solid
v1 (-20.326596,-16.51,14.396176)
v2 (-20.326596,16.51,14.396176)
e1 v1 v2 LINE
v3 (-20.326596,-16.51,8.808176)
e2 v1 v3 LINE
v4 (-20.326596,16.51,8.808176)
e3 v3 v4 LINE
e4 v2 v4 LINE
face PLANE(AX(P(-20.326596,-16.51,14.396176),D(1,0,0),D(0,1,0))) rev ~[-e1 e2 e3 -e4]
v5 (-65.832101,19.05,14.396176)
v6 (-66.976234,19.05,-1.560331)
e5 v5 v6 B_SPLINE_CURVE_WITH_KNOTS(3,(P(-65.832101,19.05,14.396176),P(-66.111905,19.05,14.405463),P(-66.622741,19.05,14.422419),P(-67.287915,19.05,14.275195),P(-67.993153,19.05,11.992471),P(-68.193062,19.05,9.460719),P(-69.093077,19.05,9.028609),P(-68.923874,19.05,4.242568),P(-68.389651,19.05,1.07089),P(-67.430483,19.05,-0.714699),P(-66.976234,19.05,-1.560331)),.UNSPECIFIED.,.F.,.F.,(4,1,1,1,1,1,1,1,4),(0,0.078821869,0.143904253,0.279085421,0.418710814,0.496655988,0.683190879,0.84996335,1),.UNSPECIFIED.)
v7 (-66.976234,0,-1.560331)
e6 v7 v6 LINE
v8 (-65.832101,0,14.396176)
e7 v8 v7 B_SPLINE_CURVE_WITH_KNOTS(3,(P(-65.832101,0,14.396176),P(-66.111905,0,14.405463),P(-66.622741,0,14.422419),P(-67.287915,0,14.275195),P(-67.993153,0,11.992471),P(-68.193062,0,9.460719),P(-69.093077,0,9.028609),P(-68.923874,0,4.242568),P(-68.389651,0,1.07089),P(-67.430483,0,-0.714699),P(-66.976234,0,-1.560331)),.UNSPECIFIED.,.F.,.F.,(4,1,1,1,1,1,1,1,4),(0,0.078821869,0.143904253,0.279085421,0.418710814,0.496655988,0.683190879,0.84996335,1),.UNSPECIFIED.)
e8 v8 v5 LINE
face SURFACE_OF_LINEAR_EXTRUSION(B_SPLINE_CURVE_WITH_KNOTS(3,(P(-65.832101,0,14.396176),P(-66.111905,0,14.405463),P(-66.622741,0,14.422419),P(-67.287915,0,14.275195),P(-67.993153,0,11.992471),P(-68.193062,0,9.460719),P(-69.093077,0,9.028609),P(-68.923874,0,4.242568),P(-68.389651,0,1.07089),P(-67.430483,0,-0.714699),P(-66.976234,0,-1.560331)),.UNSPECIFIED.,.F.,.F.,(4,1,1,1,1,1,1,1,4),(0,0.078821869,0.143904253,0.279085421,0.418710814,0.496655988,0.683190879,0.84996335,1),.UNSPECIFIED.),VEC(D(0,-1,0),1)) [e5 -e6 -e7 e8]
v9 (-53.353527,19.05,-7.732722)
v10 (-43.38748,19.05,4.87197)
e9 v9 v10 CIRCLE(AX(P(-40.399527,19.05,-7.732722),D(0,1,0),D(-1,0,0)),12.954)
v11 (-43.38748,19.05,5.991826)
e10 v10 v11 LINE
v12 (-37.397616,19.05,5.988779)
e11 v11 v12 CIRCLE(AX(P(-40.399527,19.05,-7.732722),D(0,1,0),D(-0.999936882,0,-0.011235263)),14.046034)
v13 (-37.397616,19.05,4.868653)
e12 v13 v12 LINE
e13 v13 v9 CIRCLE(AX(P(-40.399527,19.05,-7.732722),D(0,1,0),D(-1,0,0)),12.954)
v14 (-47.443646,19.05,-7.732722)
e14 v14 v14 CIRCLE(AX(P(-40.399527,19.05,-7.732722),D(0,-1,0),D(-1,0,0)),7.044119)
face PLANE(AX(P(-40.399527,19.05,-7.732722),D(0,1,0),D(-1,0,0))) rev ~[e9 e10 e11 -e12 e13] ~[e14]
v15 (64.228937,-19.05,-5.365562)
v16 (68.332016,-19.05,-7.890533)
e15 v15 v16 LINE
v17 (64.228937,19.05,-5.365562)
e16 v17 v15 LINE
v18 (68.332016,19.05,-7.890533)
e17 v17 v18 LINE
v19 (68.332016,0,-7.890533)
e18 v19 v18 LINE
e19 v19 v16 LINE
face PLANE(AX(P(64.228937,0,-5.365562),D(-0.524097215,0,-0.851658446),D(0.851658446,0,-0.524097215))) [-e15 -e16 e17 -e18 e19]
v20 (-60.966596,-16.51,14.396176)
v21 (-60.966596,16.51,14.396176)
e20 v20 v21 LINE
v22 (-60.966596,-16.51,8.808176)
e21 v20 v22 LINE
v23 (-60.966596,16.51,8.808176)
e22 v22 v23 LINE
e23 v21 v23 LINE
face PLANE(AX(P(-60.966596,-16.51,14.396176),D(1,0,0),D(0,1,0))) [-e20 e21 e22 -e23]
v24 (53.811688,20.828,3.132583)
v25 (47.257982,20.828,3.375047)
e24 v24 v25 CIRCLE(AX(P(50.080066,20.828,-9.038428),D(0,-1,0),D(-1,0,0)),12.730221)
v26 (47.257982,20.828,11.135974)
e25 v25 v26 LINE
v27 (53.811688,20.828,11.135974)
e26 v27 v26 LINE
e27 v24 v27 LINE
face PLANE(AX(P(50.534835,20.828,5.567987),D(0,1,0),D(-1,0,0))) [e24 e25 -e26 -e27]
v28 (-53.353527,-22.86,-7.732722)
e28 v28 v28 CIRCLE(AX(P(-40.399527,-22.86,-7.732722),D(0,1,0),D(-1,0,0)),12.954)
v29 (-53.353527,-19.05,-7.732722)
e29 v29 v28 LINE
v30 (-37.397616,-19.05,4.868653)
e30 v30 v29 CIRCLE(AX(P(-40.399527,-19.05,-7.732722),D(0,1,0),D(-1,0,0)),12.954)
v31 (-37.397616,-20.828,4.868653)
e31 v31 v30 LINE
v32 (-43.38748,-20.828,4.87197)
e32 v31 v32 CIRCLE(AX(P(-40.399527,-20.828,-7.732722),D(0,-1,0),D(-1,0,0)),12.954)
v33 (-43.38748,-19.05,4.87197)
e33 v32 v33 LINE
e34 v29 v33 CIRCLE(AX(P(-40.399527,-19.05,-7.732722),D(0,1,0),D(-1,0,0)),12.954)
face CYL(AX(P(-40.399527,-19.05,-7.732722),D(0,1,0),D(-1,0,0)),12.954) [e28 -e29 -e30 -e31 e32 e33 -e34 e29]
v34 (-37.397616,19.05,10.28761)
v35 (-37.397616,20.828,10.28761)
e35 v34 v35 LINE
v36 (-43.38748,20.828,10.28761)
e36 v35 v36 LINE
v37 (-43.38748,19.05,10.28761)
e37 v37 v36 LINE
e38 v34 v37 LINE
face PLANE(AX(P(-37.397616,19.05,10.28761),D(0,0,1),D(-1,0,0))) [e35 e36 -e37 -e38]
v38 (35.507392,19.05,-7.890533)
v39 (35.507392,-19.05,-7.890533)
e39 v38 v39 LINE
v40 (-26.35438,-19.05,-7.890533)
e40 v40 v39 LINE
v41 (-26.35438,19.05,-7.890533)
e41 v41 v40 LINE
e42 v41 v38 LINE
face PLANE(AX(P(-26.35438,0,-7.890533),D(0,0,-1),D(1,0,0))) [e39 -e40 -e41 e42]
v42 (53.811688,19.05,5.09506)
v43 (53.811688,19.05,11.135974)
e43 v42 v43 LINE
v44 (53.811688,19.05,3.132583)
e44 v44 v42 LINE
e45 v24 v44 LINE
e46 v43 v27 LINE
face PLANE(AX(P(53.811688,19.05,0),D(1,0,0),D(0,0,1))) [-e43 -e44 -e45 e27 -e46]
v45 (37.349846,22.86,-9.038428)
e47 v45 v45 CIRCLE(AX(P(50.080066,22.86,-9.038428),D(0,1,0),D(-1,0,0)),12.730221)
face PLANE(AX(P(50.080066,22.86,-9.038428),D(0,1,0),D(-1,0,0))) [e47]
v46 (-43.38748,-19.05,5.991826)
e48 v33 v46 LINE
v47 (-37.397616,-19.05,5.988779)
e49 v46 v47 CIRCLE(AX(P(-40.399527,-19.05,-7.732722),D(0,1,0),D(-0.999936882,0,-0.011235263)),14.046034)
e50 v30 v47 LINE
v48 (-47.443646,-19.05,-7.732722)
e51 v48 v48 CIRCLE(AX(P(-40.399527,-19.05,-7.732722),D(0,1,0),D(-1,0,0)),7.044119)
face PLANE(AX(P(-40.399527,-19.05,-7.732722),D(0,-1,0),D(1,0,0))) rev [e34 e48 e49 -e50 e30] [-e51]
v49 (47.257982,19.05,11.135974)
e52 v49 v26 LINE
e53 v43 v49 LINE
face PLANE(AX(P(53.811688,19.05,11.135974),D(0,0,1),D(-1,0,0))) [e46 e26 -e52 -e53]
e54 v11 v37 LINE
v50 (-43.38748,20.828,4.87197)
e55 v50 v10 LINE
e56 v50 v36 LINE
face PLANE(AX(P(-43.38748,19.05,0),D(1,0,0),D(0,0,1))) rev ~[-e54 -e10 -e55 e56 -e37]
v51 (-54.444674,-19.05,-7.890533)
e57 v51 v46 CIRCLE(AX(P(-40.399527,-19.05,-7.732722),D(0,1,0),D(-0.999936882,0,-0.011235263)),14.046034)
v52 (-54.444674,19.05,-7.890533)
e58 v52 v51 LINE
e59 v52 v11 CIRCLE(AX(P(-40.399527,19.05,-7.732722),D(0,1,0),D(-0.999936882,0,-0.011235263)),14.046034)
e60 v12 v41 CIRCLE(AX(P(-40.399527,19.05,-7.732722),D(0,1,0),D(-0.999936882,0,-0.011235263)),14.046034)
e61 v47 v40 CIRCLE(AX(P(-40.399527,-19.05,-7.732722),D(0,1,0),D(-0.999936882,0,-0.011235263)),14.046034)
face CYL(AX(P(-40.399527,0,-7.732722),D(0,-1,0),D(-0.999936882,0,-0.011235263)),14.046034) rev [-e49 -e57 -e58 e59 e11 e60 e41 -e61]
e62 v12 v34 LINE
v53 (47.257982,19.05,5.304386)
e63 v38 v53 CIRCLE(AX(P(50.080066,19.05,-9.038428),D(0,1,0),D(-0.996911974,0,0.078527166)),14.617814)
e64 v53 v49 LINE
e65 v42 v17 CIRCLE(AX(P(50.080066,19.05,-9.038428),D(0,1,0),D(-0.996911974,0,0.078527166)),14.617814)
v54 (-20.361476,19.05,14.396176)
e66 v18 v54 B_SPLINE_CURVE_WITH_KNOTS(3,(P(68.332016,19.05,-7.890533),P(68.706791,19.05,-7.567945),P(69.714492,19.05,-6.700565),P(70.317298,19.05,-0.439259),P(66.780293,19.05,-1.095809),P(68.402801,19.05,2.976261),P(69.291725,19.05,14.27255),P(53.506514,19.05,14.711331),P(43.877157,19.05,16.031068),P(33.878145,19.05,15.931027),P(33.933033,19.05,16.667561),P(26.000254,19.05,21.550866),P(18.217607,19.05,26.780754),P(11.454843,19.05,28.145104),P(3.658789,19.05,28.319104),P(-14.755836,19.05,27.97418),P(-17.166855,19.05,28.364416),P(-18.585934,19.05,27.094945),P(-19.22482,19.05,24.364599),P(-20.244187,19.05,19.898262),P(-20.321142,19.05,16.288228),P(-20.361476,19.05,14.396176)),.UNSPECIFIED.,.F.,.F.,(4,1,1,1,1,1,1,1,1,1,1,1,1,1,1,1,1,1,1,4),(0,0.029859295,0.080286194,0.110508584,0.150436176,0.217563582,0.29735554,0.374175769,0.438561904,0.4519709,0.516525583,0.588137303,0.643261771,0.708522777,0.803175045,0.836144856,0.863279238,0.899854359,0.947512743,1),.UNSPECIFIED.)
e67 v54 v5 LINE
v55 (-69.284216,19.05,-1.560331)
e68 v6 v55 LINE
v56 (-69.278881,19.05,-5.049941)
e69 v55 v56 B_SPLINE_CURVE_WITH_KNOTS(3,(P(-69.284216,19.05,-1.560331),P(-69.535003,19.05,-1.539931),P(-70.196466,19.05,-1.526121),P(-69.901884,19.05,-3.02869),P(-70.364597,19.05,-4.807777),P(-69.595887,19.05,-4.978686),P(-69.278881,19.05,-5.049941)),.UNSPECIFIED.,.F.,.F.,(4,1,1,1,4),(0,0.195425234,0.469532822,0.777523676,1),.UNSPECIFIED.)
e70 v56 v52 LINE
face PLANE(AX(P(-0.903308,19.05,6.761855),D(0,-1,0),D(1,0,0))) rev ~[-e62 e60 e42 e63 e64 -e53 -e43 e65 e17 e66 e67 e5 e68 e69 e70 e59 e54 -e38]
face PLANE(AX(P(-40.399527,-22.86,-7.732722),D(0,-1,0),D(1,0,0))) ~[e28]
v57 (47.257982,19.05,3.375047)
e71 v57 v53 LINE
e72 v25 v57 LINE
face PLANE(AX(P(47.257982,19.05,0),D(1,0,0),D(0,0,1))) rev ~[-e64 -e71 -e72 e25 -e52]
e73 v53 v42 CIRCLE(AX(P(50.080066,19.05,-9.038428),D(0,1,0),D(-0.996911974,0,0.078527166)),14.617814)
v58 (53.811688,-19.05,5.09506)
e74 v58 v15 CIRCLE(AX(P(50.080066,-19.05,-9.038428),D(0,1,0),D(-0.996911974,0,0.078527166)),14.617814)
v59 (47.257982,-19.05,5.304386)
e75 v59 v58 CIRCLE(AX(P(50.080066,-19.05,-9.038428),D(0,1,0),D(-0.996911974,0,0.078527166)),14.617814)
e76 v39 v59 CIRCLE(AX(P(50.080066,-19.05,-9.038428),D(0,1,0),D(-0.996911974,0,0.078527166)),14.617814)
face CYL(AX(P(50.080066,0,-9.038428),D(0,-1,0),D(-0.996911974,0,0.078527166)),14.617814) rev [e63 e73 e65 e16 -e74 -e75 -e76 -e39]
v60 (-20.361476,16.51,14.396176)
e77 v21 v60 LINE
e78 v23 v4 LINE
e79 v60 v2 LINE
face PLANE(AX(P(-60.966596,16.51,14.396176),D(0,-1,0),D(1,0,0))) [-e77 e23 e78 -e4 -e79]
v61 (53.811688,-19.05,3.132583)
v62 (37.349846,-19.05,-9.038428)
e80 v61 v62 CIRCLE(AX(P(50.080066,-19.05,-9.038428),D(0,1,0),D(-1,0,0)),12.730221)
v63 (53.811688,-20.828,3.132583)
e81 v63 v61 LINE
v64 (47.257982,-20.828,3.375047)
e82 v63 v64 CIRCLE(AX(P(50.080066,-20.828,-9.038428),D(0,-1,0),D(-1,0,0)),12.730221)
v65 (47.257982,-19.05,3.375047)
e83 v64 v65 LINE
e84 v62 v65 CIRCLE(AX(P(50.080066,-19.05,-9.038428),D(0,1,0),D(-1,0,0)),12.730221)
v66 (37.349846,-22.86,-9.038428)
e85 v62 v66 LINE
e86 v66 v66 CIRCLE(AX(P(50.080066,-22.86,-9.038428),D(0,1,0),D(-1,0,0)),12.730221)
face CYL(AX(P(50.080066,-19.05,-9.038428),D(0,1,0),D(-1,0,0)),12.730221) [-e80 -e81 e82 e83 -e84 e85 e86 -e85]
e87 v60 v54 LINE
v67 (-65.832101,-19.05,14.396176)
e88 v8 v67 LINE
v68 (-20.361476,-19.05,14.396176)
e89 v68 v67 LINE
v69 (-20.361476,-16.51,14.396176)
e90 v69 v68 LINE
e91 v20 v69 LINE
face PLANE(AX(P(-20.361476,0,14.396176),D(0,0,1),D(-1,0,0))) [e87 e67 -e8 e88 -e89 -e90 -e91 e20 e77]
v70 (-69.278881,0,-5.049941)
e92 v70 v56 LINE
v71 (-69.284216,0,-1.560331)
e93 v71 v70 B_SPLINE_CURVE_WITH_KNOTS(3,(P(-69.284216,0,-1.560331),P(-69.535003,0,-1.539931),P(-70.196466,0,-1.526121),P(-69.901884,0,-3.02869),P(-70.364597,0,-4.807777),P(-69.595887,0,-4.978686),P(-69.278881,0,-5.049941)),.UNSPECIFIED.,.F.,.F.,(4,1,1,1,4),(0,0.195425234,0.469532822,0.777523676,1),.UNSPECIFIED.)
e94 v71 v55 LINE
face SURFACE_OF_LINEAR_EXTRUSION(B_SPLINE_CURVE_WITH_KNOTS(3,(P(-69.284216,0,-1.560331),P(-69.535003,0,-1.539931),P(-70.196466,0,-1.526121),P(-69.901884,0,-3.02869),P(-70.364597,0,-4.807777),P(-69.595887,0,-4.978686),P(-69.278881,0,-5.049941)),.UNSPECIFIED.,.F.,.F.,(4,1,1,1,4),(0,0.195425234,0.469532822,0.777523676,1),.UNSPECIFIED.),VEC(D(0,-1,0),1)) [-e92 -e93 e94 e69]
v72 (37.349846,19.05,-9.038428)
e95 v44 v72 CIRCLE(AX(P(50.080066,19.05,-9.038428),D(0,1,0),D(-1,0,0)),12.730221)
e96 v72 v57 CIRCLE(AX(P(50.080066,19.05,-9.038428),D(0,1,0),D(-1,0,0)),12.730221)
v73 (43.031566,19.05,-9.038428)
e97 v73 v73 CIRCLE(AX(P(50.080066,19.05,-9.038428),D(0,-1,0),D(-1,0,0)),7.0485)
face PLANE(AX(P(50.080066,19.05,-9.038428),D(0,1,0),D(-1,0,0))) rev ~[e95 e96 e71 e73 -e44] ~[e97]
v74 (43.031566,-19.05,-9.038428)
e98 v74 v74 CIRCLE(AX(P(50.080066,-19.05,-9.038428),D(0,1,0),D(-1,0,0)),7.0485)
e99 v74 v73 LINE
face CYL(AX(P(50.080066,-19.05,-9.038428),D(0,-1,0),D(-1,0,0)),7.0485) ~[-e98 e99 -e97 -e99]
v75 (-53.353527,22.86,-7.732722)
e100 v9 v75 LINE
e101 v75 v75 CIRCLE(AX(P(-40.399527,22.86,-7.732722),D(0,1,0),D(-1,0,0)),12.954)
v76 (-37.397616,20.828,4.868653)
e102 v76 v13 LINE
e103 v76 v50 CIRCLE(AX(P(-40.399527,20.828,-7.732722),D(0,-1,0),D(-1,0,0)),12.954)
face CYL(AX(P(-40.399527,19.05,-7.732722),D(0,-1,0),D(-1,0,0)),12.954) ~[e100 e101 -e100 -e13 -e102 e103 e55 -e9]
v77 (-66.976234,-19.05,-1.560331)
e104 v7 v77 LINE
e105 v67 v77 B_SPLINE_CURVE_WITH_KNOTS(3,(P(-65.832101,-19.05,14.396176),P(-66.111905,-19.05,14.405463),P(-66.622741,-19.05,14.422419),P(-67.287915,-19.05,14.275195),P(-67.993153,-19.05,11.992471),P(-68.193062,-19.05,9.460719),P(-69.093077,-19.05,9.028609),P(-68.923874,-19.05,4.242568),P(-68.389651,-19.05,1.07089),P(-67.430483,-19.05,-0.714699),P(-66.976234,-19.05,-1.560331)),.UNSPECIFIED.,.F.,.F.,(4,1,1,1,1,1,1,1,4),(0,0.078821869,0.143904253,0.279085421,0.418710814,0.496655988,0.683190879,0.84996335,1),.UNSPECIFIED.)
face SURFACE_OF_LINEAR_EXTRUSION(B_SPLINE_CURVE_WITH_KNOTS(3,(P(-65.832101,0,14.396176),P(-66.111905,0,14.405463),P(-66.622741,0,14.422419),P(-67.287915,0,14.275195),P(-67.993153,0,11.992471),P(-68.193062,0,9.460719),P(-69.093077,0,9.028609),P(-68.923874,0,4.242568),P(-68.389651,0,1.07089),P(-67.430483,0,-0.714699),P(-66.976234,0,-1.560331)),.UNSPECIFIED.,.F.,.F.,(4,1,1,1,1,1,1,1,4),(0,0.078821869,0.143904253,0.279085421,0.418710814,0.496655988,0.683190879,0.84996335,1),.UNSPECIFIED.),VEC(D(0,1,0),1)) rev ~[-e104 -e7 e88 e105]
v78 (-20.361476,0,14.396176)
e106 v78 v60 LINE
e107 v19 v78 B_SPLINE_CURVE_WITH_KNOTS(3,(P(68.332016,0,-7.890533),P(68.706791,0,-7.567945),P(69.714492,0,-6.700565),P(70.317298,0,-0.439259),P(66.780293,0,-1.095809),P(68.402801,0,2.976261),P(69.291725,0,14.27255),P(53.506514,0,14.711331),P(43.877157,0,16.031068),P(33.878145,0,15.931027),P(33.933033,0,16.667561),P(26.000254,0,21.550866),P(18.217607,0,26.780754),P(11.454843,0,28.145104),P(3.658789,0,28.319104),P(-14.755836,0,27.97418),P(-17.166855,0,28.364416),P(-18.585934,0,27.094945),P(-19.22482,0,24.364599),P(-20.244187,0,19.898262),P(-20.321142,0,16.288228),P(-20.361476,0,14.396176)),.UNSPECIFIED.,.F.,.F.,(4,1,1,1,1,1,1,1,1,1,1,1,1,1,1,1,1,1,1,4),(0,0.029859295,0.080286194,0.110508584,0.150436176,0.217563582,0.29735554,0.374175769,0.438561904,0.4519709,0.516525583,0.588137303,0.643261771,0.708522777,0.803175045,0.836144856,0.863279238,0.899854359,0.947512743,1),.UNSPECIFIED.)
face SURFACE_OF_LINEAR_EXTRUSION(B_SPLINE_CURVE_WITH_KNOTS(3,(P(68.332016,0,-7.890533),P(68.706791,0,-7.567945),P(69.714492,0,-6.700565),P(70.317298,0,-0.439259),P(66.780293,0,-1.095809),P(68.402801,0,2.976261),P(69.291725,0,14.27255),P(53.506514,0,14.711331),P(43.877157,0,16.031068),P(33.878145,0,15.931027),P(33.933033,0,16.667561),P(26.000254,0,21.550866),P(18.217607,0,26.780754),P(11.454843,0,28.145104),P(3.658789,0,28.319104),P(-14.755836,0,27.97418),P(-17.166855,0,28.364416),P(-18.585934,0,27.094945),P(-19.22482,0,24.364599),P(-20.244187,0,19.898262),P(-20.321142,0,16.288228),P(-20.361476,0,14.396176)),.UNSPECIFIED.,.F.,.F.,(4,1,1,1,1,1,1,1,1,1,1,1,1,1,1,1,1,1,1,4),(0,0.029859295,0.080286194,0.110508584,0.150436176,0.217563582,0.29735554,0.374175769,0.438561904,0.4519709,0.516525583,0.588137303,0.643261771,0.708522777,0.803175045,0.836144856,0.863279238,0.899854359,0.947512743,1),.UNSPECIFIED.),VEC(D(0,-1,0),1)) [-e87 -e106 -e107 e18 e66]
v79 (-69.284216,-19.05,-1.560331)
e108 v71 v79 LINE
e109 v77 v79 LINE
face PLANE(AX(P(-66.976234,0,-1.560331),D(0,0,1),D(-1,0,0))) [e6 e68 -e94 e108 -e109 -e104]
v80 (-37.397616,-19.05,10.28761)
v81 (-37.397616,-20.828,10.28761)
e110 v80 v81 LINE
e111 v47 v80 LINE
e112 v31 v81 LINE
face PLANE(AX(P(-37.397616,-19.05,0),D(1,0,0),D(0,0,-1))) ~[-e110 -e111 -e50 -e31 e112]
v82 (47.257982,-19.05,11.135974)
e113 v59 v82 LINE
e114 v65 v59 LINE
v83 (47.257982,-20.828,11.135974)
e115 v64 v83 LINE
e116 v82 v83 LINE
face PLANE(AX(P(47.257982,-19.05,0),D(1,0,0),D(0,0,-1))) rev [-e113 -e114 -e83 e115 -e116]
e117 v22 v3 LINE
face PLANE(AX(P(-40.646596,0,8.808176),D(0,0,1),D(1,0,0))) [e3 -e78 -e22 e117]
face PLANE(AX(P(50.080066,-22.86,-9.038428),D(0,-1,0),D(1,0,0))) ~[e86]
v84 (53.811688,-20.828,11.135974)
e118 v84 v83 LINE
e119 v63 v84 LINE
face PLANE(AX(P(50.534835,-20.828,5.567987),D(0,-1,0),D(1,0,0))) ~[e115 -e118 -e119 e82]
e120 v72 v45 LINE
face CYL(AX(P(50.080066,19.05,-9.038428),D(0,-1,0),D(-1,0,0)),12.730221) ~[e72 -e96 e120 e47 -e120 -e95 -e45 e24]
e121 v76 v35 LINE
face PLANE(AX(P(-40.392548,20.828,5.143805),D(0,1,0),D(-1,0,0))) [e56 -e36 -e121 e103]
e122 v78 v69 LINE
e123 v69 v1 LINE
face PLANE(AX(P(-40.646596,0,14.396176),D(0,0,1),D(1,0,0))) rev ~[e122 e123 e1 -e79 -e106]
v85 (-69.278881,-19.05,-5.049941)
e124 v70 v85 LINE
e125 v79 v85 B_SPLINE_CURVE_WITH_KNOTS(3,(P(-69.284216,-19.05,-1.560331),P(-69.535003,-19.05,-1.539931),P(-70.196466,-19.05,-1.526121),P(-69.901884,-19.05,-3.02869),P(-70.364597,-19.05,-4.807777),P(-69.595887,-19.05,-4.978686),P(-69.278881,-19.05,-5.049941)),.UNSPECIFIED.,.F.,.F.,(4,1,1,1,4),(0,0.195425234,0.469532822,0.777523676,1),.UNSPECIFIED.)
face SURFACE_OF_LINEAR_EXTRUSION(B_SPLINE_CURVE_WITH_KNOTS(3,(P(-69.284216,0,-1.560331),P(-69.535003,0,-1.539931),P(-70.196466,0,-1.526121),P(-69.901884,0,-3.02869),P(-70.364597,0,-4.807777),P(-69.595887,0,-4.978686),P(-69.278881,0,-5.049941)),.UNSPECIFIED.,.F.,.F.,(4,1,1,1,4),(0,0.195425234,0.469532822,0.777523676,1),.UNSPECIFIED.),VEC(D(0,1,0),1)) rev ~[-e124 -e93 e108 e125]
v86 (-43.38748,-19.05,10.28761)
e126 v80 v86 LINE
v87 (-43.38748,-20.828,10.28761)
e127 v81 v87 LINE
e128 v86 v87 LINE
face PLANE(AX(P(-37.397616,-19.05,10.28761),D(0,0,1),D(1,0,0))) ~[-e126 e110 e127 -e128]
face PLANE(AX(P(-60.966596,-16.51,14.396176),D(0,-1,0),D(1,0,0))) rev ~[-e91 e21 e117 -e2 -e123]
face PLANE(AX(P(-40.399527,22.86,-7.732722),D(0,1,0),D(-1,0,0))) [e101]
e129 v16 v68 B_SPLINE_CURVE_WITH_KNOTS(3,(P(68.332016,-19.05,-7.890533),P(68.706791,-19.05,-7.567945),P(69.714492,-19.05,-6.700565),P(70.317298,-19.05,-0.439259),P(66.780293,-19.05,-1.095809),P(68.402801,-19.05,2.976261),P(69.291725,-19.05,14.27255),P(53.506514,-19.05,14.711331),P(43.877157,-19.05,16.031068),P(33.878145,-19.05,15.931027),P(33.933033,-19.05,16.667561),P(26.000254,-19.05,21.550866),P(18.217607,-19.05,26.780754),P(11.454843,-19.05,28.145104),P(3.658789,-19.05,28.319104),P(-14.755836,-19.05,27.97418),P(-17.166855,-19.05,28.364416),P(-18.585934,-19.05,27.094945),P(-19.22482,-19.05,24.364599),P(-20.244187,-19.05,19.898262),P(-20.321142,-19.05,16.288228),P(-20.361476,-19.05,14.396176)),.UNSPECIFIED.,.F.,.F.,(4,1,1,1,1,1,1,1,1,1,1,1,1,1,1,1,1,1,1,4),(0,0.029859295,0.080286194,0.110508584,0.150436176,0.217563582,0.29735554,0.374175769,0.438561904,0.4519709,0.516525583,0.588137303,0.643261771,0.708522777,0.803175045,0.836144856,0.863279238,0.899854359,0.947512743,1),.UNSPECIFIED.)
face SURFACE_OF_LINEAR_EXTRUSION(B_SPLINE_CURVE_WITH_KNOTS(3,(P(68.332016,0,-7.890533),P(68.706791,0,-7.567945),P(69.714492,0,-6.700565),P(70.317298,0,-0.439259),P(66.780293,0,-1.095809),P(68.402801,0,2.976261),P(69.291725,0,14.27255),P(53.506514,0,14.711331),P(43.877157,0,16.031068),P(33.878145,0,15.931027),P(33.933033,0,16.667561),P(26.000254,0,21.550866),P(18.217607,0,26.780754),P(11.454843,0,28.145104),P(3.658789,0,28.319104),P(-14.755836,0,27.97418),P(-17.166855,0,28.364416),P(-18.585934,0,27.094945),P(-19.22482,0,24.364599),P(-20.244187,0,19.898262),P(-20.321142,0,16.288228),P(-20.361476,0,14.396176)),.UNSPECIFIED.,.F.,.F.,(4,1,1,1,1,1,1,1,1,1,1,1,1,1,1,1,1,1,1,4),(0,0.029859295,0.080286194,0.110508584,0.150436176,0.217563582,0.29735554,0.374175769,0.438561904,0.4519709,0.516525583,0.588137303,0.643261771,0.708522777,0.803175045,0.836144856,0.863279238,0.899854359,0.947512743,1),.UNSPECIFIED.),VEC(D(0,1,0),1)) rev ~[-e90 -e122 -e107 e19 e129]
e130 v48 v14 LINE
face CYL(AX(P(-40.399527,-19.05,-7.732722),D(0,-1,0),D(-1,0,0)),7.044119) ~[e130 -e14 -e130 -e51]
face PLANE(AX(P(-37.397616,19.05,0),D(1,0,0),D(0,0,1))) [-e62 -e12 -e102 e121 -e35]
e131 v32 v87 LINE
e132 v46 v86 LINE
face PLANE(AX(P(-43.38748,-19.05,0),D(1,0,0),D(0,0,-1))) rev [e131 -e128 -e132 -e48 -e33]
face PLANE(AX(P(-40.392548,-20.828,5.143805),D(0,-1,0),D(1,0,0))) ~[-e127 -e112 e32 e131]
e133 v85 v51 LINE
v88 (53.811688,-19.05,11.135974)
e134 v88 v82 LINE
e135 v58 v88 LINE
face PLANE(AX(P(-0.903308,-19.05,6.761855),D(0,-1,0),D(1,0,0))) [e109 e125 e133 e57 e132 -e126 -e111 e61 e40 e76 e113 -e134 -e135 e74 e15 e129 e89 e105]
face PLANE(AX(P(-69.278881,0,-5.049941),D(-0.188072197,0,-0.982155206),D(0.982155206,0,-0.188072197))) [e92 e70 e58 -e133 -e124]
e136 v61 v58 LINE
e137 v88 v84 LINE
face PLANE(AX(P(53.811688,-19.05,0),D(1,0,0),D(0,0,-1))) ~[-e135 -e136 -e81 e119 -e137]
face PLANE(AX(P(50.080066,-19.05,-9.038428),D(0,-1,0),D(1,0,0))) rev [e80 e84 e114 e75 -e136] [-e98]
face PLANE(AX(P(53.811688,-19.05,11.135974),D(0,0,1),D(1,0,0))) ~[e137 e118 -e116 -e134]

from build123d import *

# Parameters (mm, degrees)
F1_DEPTH  = 19.05
F2_W      = 40.64
F2_H      = 33.02
F3_DEPTH  = 5.588
F4_R      = 12.9540001242
F5_DEPTH  = 3.81
F4_R_2    = 12.7302206493
F7_R      = 7.0441186389
F9_DEPTH  = 40.386
F8_R      = 7.0485
F10_W     = 5.9898644686
F10_H     = 10.2876098827
F11_DEPTH = 1.778
F12_W     = 6.5537057817
F12_H     = 11.1359739676
F13_DEPTH = 1.778


# Not quite as in the source:
# - a feature names something its author has since deleted; it is built from what else it names


with BuildPart() as f1:
    # F0 (on Front) → F1 (new body, symmetric)
    with BuildSketch(Plane.XZ):
        with BuildLine():
            add(Edge.make_bspline(
                [(-69.2842155695, -1.5603305073), (-69.5350025172, -1.5399307664), (-70.1964658552, -1.526121286), (-69.9018841173, -3.0286902092), (-70.3645967063, -4.8077768479), (-69.5958865333, -4.978686168), (-69.2788809538, -5.04994113)],
                knots=[0, 0, 0, 0, 0.1954252336, 0.4695328217, 0.7775236757, 1, 1, 1, 1], degree=3))
            Line((-69.2788809538, -5.04994113), (-54.4446744025, -7.8905327246))
            ThreePointArc((-54.4446744025, -7.8905327246), (-40.3995271772, 6.3133119394), (-26.354379952, -7.8905327246))
            Line((-26.354379952, -7.8905327246), (35.5073921382, -7.8905327246))
            ThreePointArc((35.5073921382, -7.8905327246), (48.7999211019, 5.5232241619), (64.2289370298, -5.3655621596))
            Line((64.2289370298, -5.3655621596), (68.332016468, -7.8905327246))
            add(Edge.make_bspline(
                [(68.332016468, -7.8905327246), (68.7067913051, -7.5679449616), (69.714492426, -6.7005653561), (70.3172984159, -0.4392585426), (66.7802927419, -1.0958089063), (68.4028013282, 2.9762612334), (69.2917253521, 14.2725497335), (53.5065140597, 14.7113305441), (43.8771565321, 16.0310681315), (33.8781446405, 15.9310273294), (33.9330328582, 16.6675611215), (26.0002542616, 21.5508658082), (18.2176068002, 26.7807544456), (11.4548434095, 28.1451041805), (3.6587892983, 28.3191044585), (-14.7558362833, 27.9741795524), (-17.1668552051, 28.3644164723), (-18.5859335818, 27.0949449022), (-19.2248198393, 24.36459907), (-20.2441867929, 19.8982618034), (-20.3211424661, 16.2882279072), (-20.3614756465, 14.3961757421)],
                knots=[0, 0, 0, 0, 0.0298592954, 0.0802861944, 0.110508584, 0.1504361757, 0.217563582, 0.2973555397, 0.3741757692, 0.438561904, 0.4519709004, 0.5165255825, 0.5881373031, 0.6432617714, 0.7085227769, 0.8031750452, 0.8361448558, 0.8632792375, 0.8998543586, 0.9475127428, 1, 1, 1, 1], degree=3))
            Line((-20.3614756465, 14.3961757421), (-65.8321008086, 14.3961757421))
            add(Edge.make_bspline(
                [(-65.8321008086, 14.3961757421), (-66.1119049823, 14.4054631172), (-66.6227405068, 14.4224189798), (-67.2879149417, 14.2751954831), (-67.9931529597, 11.9924706508), (-68.1930622811, 9.4607186493), (-69.0930767314, 9.0286087442), (-68.9238735496, 4.2425680846), (-68.3896505368, 1.0708895061), (-67.4304833389, -0.7146991208), (-66.9762343168, -1.5603305073)],
                knots=[0, 0, 0, 0, 0.0788218688, 0.1439042534, 0.2790854206, 0.4187108143, 0.4966559878, 0.6831908786, 0.8499633496, 1, 1, 1, 1], degree=3))
            Line((-66.9762343168, -1.5603305073), (-69.2842155695, -1.5603305073))
        make_face()
    extrude(amount=F1_DEPTH, both=True)

    # F2 (on face) → F3 (cut)
    with BuildSketch(Plane.XY.offset(14.3961757421)):
        with Locations((-40.6465960781, 0)):
            Rectangle(F2_W, F2_H)
    extrude(amount=-F3_DEPTH, mode=Mode.SUBTRACT)



with BuildPart() as f5:
    # F4 (on face) → F5 (new body)
    with BuildSketch(Plane(origin=(0, 19.05, 0), x_dir=(-1, 0, 0), z_dir=(0, 1, 0))):
        with Locations((40.3995271772, -7.7327218372)):
            Circle(F4_R)
    extrude(amount=F5_DEPTH)


with BuildPart() as f5b:
    # F4 (on face) → F5, piece 2 (new body)
    with BuildSketch(Plane(origin=(0, 19.05, 0), x_dir=(-1, 0, 0), z_dir=(0, 1, 0))):
        with Locations((-50.0800661584, -9.0384282465)):
            Circle(F4_R_2)
    extrude(amount=F5_DEPTH)


with BuildPart() as f6_1:
    # F6: instance of F5
    add(f5.part.mirror(Plane.XZ))


with BuildPart() as f6_2:
    # F6: instance of F5b
    add(f5b.part.mirror(Plane.XZ))


with BuildPart() as f5_1:
    add(f5.part)

    add(f6_1.part)  # F9 merges F6_1
    # F7 (on face) → F9 (join)
    with BuildSketch(Plane(origin=(0, -19.05, 0), x_dir=(-1, 0, 0), z_dir=(0, 1, 0))):
        with Locations((40.3995271772, -7.7327218372)):
            Circle(F7_R)
    extrude(amount=F9_DEPTH)


with BuildPart() as f5b_1:
    add(f5b.part)

    add(f6_2.part)  # F9#2 merges F6_2
    # F8 (on face) → F9, piece 2 (join)
    with BuildSketch(Plane(origin=(0, -19.05, 0), x_dir=(-1, 0, 0), z_dir=(0, 1, 0))):
        with Locations((-50.0800661584, -9.0384282465)):
            Circle(F8_R)
    extrude(amount=F9_DEPTH)


with BuildPart() as f1_1:
    add(f1.part)

    add(f5_1.part)  # F11 merges F5
    # F10 (on face) → F11 (join)
    with BuildSketch(Plane(origin=(0, 19.05, 0), x_dir=(-1, 0, 0), z_dir=(0, 1, 0))):
        with Locations((40.3925478458, 5.1438049413)):
            Rectangle(F10_W, F10_H)
    extrude(amount=F11_DEPTH)


    add(f5b_1.part)  # F13 merges F5b
    # F12 (on face) → F13 (join)
    with BuildSketch(Plane(origin=(0, 19.05, 0), x_dir=(-1, 0, 0), z_dir=(0, 1, 0))):
        with Locations((-50.5348350853, 5.5679869838)):
            Rectangle(F12_W, F12_H)
    extrude(amount=F13_DEPTH)

    # F14: F1 across plane


with BuildPart() as f1_2:
    add(f1_1.part)
    add(f1_1.part.mirror(Plane.XZ))


solid = f1_2.part
